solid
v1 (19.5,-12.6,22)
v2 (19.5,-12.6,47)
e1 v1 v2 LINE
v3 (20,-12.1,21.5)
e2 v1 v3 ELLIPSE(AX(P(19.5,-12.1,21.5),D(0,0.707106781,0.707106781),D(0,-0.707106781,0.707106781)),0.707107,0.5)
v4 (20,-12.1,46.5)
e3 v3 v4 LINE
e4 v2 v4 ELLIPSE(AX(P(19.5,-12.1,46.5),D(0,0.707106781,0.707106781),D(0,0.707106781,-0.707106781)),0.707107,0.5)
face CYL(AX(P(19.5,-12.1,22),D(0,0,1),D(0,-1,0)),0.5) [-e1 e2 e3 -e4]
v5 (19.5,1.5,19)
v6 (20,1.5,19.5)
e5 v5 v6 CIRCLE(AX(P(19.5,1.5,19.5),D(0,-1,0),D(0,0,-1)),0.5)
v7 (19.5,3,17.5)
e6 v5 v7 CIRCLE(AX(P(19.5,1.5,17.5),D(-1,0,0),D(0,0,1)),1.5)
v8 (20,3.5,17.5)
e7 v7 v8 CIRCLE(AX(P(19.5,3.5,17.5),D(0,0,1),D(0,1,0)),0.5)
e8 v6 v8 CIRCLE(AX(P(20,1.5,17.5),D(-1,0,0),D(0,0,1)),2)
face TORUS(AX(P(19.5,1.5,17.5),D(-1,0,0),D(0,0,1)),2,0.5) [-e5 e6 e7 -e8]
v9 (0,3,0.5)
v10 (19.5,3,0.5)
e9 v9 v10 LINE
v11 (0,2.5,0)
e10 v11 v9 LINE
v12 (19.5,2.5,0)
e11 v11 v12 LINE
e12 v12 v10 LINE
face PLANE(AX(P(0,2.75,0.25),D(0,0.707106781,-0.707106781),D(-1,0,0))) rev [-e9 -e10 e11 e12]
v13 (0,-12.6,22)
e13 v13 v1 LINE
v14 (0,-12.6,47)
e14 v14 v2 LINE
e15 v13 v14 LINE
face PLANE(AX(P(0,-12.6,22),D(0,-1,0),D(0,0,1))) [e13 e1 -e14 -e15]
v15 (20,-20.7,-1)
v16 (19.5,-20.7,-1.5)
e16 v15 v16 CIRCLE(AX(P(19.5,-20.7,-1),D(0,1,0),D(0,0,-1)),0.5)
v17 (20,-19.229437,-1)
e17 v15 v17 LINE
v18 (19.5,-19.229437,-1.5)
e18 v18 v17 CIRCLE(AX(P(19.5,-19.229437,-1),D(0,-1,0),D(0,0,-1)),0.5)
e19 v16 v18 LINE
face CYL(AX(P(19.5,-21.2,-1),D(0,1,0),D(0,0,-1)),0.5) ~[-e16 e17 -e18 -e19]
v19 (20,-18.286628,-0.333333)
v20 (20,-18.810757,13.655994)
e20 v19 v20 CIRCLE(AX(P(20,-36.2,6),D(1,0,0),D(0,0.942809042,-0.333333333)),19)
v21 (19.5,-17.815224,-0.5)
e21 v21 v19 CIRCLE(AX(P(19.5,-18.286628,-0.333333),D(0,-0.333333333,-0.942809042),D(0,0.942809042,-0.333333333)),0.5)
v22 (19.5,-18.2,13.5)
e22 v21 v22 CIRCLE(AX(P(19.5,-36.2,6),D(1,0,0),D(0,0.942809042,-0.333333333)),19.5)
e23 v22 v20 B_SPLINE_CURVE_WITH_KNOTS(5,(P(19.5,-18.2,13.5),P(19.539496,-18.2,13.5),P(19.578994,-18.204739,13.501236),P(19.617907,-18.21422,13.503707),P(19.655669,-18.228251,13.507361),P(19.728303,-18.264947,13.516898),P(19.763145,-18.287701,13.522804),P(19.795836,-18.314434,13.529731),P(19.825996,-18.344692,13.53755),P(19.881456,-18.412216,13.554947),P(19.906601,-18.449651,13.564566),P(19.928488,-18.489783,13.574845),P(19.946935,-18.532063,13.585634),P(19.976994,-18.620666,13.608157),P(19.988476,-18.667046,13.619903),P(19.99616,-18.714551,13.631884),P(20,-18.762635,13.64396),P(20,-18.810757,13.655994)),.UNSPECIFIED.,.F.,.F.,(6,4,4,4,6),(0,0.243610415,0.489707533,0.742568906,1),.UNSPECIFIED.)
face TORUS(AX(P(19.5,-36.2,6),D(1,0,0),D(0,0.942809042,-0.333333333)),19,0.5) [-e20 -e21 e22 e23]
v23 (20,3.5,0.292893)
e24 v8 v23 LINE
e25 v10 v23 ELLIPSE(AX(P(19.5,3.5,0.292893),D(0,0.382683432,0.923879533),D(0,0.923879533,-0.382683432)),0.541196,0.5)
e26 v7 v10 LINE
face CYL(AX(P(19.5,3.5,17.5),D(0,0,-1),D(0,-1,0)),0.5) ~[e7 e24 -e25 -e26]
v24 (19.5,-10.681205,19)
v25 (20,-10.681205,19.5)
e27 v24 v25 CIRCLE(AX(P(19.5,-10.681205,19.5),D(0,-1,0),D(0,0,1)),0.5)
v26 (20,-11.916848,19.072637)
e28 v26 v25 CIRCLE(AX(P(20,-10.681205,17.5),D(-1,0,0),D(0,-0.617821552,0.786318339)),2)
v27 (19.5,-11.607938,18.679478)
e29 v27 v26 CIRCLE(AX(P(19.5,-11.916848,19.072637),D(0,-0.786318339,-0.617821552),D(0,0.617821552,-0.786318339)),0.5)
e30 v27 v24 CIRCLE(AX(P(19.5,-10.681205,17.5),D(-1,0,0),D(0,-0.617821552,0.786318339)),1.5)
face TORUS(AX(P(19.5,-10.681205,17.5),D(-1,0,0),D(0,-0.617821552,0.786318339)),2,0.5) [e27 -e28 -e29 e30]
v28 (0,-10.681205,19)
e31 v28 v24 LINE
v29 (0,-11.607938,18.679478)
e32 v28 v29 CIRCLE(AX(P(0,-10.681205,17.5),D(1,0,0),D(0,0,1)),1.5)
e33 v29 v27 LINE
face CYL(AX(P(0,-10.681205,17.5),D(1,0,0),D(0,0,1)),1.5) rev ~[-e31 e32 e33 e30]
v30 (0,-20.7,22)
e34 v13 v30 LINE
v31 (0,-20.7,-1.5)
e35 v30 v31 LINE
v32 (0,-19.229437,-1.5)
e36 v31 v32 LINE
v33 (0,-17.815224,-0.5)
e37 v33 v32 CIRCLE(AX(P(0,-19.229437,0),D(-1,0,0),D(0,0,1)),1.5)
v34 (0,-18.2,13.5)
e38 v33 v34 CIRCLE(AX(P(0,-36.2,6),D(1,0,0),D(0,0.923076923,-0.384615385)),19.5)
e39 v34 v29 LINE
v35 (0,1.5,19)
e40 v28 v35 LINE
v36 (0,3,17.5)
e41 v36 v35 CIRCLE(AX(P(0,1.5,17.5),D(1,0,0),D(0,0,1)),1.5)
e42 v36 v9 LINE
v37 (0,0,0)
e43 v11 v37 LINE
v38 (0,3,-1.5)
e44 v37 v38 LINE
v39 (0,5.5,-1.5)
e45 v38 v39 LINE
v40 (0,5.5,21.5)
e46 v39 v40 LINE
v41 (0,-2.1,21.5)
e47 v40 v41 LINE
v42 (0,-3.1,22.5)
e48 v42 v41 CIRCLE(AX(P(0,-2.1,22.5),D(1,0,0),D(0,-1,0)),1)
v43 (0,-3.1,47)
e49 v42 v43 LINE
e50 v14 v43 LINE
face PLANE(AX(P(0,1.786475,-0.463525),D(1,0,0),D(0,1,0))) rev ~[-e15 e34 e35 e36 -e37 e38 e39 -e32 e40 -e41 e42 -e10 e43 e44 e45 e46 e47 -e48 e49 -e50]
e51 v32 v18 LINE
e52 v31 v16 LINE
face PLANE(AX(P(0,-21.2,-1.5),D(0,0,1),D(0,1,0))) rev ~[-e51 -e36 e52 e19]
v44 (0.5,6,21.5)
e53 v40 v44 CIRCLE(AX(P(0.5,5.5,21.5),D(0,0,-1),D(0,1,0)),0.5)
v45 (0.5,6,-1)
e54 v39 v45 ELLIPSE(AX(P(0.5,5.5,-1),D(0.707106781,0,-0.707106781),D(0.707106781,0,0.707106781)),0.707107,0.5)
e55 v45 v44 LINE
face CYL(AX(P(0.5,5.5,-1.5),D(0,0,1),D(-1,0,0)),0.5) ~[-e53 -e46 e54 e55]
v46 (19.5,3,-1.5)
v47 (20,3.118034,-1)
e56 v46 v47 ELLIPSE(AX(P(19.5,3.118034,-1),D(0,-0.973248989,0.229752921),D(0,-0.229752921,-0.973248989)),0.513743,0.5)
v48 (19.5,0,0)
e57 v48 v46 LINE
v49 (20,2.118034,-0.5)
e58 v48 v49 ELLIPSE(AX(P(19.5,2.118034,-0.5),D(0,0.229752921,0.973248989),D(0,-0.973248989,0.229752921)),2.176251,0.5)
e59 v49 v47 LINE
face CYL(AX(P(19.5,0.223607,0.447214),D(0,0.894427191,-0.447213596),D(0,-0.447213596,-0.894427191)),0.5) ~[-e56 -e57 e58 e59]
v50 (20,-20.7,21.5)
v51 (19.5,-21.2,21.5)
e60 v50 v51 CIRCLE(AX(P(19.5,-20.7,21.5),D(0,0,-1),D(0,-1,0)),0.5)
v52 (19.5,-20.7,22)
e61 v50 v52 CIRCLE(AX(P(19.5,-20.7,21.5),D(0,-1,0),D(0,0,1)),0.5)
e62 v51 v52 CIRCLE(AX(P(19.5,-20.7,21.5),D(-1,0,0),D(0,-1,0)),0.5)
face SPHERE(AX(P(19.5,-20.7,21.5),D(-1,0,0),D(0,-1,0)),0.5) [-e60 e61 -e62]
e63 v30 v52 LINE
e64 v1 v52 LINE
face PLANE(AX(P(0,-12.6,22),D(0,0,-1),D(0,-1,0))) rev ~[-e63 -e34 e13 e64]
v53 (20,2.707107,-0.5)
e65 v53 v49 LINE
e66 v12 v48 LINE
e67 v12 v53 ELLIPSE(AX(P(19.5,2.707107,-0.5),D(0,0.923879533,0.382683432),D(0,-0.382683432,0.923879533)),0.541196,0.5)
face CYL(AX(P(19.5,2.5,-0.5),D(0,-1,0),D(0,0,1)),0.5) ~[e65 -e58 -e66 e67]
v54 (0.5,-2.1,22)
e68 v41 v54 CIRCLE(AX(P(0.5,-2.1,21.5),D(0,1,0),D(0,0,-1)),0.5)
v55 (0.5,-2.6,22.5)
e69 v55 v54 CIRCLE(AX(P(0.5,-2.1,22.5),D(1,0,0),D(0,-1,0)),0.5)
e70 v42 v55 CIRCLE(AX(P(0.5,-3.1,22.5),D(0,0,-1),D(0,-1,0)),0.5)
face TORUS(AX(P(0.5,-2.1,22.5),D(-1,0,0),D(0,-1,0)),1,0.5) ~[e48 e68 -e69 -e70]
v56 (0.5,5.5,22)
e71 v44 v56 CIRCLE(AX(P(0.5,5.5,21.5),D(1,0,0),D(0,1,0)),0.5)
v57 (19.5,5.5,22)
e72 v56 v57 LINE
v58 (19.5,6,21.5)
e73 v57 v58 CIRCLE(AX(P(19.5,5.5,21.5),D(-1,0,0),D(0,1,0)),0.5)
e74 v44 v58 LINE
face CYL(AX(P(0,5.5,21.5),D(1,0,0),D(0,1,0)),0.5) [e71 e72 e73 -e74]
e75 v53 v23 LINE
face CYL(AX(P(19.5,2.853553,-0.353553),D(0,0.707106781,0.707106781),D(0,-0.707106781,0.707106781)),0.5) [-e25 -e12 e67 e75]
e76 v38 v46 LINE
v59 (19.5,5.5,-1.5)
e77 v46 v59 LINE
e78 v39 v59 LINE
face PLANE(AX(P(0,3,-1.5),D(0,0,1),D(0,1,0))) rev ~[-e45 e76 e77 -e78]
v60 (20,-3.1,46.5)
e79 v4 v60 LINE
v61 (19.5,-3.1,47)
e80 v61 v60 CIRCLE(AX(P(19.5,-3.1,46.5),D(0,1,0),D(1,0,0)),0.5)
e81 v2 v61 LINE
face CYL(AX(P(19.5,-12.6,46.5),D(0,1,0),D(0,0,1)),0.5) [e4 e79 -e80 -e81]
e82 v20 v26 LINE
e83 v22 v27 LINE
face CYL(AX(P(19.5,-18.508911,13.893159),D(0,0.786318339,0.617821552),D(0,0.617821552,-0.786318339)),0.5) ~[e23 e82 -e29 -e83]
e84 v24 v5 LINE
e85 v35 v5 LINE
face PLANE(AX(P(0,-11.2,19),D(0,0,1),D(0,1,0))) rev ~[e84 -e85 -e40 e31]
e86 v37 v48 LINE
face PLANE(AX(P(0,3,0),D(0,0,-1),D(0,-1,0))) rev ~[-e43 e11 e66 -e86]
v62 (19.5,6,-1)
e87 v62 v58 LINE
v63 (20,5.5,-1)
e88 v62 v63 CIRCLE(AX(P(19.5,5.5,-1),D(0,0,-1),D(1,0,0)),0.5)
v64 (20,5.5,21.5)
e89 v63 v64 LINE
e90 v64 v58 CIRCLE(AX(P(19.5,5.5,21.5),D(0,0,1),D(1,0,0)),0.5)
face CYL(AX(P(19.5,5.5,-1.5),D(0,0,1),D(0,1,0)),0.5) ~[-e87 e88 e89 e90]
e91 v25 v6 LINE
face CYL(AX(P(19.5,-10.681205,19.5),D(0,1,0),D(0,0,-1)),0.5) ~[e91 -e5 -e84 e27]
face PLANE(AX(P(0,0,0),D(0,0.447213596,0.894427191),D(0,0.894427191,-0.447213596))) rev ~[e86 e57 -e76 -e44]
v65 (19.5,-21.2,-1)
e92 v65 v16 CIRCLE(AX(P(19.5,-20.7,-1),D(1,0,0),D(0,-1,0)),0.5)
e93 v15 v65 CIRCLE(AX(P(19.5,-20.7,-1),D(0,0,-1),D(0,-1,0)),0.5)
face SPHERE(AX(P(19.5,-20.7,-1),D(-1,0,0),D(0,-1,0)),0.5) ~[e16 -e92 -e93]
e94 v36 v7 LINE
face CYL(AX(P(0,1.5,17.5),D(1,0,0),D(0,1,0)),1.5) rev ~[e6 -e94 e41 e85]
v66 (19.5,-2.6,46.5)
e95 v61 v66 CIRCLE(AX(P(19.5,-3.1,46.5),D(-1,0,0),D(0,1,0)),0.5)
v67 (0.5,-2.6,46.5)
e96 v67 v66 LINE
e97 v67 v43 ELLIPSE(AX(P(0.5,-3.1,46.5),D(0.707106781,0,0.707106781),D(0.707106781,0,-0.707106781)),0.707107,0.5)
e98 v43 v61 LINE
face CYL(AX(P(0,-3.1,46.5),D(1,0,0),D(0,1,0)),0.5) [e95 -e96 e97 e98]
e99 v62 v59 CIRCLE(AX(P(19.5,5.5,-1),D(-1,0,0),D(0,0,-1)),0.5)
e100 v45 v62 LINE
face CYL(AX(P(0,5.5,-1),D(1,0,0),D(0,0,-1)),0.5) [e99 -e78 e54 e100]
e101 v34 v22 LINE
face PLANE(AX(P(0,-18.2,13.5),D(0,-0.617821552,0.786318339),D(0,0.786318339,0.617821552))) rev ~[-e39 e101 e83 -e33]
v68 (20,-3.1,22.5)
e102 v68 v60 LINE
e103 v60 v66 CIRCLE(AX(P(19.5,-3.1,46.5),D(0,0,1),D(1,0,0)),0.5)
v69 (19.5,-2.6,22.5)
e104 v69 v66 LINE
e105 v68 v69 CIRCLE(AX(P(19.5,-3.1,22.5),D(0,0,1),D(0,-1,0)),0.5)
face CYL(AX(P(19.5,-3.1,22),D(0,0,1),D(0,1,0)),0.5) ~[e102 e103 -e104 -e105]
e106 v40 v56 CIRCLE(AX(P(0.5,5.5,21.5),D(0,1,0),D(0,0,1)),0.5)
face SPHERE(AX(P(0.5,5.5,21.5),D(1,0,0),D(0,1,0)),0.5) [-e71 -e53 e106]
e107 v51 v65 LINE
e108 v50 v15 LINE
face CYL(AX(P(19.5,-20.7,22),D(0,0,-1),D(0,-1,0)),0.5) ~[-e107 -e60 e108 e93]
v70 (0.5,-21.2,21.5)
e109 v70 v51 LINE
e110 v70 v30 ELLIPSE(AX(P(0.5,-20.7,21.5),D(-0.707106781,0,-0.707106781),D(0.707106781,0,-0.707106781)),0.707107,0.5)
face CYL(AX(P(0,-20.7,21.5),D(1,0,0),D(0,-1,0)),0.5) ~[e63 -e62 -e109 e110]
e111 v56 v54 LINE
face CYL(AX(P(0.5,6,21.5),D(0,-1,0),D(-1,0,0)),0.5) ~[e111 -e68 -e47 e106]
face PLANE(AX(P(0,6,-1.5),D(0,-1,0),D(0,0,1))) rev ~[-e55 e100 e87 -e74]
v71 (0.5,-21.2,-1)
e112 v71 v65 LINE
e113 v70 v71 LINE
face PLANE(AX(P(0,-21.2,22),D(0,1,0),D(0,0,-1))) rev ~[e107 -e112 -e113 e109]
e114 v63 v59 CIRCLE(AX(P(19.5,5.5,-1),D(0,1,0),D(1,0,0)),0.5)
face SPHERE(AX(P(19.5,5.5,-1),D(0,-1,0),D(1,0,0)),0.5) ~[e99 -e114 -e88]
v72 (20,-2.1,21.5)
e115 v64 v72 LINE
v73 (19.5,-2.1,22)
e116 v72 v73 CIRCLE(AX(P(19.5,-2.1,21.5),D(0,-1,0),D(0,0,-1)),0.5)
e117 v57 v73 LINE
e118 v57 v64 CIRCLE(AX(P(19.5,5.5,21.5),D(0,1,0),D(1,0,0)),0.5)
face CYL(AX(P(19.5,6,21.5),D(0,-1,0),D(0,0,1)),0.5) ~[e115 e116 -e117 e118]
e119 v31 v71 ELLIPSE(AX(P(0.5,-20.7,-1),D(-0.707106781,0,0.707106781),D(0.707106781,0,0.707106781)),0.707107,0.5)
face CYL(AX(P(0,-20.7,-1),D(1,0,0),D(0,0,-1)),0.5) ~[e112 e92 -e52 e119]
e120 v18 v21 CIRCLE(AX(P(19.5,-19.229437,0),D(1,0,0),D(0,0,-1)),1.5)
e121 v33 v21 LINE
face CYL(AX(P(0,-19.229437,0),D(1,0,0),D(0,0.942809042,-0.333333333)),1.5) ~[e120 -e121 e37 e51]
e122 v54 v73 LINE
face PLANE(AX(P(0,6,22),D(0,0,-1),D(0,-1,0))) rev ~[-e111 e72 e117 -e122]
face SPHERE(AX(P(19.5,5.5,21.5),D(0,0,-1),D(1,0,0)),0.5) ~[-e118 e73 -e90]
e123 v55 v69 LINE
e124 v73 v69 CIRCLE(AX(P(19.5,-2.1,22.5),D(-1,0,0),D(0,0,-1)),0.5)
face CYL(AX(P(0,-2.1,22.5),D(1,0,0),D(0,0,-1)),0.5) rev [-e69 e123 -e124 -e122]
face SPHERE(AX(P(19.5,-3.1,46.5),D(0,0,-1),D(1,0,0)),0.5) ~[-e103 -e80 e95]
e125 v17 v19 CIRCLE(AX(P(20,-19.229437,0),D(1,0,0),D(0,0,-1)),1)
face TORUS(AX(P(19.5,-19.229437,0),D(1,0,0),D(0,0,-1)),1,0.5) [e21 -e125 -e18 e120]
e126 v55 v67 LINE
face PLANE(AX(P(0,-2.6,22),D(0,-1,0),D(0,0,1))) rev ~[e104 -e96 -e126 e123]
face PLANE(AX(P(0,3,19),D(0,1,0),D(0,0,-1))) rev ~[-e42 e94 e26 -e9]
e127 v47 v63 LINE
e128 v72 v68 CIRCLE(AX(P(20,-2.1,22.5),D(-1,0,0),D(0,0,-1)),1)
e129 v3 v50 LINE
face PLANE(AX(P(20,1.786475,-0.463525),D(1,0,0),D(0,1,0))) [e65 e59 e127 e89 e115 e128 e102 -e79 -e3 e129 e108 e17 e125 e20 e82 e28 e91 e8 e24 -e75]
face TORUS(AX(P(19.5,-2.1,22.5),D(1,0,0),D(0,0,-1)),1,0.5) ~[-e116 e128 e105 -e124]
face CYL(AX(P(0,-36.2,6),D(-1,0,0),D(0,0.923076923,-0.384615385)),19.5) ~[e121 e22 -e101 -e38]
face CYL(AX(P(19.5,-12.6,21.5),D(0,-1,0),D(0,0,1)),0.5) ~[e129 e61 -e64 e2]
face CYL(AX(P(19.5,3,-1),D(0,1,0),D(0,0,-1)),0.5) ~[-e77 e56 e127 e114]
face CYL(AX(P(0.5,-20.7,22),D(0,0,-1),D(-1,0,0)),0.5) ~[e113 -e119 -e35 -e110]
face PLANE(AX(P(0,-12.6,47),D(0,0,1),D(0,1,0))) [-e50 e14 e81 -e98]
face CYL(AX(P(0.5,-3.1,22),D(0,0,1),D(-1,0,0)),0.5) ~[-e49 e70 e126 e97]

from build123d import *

# Parameters (mm, degrees)
F0_W     = 10
F0_H     = 25
F1_DEPTH = 20
F2_SIZE  = 0.5
F3_R     = 1.5
F4_R     = 0.5


with BuildPart() as f1:
    # F0 (on Right) → F1 (new body)
    with BuildSketch(Plane.YZ):
        Polygon((3, 0), (0, 0), (3, -1.5), align=None)
        Polygon((3, 19), (3, 0), (3, -1.5), (6, -1.5), (6, 22), (-2.6, 22), (-12.6, 22), (-21.2, 22), (-21.2, -1.5), (-18.2, -1.5), (-18.2, 13.5), (-18.2, 19), (-11.2, 19), align=None)
        Polygon((-18.2, 13.5), (-11.2, 19), (-18.2, 19), align=None)
        with BuildLine():
            ThreePointArc((-18.2, -1.5), (-16.7, 6), (-18.2, 13.5))
            Line((-18.2, 13.5), (-18.2, -1.5))
        make_face()
        with Locations((-7.6, 34.5)):
            Rectangle(F0_W, F0_H)
    extrude(amount=F1_DEPTH)

    # F2
    f2_edges = [f1.edges().sort_by_distance(p)[0] for p in [
        (10, 3, 0),
    ]]
    chamfer(f2_edges, length=F2_SIZE)

    # F3
    f3_edges = [f1.edges().sort_by_distance(p)[0] for p in [
        (10, 3, 19),
        (10, -11.2, 19),
        (10, -18.2, -1.5),
    ]]
    fillet(f3_edges, radius=F3_R)

    # F4
    f4_edges = [f1.edges().sort_by_distance(p)[0] for p in [
        (10, -21.2, 22),
        (10, -21.2, -1.5),
        (0, -21.2, 10.25),
        (20, -21.2, 10.25),
        (20, 3, 9),
        (20, 2.56066, 18.56066),
        (20, 2.75, 0.25),
        (20, -4.590603, 19),
        (20, 1.25, 0),
        (20, -11.171503, 18.917606),
        (20, 1.5, -0.75),
        (20, -14.903969, 16.089739),
        (20, 4.5, -1.5),
        (20, -16.707361, 6.535736),
        (20, 6, 10.25),
        (20, -18.363412, -1.224745),
        (20, 1.7, 22),
        (20, -20.214719, -1.5),
        (20, -2.6, 34.5),
        (20, -7.6, 47),
        (20, -16.9, 22),
        (20, -12.6, 34.5),
        (10, 6, -1.5),
        (10, 6, 22),
        (0, 6, 10.25),
        (10, -2.6, 22),
        (10, -2.6, 47),
        (0, -2.6, 34.5),
        (0, 1.7, 22),
    ]]
    fillet(f4_edges, radius=F4_R)


solid = f1.part
